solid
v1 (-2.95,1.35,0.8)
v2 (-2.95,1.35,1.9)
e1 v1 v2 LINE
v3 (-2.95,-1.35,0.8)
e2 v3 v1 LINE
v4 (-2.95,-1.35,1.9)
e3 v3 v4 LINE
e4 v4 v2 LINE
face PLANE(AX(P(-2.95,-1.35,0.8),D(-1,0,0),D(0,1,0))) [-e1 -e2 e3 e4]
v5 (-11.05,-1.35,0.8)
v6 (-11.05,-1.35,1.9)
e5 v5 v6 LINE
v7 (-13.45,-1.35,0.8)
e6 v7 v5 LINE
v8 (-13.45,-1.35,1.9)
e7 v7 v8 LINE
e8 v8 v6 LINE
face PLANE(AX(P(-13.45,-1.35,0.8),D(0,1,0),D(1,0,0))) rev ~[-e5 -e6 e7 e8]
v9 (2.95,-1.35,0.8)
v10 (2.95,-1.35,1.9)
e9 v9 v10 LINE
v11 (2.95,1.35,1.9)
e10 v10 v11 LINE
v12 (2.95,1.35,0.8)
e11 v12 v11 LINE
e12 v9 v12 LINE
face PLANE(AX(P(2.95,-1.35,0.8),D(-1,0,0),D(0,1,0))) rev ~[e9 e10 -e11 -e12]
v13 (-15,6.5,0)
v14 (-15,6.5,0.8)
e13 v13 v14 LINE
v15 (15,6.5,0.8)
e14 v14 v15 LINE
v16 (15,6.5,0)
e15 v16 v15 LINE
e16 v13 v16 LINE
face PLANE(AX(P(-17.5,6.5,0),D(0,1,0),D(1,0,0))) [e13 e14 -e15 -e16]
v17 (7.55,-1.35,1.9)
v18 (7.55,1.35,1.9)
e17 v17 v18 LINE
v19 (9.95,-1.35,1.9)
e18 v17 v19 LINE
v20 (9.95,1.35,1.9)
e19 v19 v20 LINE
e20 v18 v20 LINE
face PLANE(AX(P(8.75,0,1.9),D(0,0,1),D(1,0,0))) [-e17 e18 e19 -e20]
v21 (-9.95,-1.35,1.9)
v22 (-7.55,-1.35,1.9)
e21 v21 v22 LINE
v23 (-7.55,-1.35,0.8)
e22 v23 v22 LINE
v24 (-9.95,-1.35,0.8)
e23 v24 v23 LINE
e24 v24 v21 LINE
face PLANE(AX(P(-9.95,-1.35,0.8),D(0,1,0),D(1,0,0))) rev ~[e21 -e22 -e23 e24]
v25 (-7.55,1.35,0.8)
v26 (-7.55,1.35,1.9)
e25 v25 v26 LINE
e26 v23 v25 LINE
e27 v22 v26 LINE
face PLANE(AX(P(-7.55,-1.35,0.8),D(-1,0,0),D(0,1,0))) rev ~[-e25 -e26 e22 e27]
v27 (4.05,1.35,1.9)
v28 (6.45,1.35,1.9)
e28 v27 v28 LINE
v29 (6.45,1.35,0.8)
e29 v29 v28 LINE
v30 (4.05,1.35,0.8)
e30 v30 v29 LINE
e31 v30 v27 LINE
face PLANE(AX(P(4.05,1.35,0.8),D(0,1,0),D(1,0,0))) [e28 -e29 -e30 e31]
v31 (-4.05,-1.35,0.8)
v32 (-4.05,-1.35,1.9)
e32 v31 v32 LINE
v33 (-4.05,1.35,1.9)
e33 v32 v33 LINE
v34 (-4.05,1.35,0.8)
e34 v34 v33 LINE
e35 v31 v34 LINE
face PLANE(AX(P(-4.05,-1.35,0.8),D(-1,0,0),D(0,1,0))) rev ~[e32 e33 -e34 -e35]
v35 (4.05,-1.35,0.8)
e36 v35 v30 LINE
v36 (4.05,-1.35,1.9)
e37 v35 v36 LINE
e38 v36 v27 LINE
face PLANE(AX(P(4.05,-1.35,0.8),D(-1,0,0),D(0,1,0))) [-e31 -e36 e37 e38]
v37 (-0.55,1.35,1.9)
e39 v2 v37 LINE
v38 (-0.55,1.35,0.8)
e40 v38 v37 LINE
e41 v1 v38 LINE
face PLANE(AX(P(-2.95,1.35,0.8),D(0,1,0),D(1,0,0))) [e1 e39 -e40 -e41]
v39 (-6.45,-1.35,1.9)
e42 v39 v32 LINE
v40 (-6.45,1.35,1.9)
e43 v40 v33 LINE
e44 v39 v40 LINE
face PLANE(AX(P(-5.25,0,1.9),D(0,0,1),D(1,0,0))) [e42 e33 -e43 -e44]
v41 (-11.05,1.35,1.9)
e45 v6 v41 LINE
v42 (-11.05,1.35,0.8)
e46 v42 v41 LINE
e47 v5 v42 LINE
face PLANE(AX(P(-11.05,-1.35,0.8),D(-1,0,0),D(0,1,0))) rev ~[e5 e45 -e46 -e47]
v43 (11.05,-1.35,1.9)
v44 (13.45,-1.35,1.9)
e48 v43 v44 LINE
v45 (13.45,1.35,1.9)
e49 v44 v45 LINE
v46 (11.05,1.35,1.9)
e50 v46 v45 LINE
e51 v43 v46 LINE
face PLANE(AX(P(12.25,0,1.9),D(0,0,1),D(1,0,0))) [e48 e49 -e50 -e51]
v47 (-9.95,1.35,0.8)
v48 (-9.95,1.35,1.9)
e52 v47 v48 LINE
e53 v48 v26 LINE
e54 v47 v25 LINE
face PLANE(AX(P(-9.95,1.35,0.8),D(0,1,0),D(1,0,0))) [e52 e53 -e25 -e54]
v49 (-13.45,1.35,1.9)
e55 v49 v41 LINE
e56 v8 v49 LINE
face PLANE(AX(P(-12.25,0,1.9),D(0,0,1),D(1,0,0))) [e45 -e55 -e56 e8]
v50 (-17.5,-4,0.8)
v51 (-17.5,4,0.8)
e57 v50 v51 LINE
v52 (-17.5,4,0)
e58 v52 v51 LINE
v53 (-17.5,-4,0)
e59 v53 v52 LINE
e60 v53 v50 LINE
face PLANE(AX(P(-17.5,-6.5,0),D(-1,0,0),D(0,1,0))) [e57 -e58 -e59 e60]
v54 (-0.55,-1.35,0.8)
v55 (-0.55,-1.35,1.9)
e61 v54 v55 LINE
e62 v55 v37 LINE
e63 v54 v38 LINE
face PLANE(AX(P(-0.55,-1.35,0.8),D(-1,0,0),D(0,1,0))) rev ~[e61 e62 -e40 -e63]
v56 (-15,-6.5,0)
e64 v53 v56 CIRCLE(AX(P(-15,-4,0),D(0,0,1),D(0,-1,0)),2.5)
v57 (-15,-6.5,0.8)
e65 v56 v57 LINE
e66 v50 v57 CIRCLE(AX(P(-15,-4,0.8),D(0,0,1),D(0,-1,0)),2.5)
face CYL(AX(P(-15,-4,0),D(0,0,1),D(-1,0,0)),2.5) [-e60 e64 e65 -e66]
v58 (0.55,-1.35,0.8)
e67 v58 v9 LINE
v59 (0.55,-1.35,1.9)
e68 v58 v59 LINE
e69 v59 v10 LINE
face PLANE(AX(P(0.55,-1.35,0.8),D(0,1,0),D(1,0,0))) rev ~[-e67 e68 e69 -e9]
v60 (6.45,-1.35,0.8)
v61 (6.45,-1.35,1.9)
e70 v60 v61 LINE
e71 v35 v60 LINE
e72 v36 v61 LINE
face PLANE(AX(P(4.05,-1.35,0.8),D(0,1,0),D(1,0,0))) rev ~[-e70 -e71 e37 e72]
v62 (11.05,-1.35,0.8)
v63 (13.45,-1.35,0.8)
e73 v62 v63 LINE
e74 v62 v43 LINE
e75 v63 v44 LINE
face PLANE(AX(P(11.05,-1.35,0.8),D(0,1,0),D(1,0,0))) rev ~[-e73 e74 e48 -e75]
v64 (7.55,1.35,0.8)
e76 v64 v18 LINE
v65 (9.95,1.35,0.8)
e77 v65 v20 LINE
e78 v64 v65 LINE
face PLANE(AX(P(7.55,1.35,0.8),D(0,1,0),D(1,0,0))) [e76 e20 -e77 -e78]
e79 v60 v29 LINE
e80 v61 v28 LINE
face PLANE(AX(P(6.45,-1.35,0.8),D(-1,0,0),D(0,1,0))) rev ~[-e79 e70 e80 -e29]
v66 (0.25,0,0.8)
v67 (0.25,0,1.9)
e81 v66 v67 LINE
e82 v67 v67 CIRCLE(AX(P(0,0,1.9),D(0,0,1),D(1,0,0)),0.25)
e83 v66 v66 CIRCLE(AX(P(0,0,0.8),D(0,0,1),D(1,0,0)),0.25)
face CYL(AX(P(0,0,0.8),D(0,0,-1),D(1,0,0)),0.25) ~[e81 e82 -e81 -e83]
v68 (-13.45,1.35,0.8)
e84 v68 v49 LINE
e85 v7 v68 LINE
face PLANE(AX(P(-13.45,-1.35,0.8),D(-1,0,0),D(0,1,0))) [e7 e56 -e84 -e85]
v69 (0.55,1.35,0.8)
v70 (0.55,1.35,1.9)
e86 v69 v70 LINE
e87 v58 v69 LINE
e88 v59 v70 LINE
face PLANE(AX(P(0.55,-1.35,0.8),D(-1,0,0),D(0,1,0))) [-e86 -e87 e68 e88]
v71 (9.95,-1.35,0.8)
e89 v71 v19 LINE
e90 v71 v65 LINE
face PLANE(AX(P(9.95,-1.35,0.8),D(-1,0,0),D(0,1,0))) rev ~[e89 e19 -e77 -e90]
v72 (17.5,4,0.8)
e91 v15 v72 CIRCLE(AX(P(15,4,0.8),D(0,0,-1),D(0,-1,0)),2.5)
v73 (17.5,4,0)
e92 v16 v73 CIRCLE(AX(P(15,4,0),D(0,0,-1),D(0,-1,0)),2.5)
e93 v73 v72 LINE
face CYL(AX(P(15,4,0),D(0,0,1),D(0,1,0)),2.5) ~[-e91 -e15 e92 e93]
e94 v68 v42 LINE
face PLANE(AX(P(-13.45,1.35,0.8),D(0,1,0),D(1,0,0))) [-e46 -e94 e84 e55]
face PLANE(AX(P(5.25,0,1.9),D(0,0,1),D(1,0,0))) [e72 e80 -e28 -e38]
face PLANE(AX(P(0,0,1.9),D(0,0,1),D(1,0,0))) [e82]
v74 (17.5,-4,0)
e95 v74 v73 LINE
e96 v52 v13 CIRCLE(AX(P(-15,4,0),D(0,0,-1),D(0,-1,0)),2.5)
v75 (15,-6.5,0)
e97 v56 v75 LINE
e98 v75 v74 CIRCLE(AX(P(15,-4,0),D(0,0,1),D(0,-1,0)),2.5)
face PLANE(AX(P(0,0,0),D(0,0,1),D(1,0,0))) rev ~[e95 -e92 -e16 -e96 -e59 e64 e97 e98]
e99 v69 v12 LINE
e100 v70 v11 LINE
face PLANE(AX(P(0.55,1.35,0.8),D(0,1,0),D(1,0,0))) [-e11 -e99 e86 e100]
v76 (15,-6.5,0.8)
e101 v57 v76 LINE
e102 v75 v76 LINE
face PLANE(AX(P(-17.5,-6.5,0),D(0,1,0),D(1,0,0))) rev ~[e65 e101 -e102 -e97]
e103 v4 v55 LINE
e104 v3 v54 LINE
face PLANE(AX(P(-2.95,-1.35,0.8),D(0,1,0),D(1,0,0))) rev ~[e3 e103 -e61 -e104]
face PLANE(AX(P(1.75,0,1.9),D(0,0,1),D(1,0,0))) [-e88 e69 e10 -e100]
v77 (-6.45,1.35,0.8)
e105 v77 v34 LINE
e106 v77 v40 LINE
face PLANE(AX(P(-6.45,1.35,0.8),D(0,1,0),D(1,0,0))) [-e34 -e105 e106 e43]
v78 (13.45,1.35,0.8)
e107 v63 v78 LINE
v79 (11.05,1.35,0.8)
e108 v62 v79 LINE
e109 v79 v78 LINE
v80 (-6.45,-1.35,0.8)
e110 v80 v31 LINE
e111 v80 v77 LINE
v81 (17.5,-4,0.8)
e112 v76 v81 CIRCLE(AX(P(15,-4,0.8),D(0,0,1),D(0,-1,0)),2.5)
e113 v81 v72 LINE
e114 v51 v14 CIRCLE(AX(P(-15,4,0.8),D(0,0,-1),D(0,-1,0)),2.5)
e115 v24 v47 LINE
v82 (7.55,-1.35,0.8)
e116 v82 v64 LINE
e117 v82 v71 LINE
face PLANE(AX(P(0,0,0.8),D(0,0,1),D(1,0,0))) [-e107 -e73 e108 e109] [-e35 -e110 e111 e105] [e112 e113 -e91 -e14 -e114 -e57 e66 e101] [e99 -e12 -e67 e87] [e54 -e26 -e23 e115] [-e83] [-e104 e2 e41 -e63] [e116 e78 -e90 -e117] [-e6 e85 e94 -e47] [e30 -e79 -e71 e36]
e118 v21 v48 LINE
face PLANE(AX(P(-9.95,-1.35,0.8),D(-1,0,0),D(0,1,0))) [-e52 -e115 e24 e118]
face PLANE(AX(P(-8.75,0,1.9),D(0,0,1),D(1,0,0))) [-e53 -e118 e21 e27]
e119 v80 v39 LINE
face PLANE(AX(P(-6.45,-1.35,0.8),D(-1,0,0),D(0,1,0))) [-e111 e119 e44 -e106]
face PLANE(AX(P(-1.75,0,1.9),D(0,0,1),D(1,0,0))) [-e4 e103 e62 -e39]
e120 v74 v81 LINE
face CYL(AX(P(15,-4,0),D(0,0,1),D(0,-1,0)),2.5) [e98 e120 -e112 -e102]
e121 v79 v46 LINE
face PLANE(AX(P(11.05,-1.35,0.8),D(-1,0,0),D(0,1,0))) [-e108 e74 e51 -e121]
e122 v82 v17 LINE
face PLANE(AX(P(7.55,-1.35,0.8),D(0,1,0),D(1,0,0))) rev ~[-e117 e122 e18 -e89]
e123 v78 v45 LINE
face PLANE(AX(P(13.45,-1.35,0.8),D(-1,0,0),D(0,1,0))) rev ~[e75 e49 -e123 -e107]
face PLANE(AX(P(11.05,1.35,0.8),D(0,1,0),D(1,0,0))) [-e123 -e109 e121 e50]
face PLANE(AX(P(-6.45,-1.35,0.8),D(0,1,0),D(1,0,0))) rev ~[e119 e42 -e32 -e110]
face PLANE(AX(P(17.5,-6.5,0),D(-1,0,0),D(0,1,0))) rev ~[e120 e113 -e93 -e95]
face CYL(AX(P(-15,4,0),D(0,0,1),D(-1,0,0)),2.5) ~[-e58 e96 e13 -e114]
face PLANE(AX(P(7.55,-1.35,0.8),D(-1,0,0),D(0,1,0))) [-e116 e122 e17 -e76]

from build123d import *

# Parameters (mm, degrees)
F0_W     = 35
F0_H     = 13
F1_DEPTH = 0.8
F2_W     = 2.4
F2_H     = 2.7
F3_DEPTH = 1.1
F4_R     = 2.5
F5_R     = 0.25
F6_DEPTH = 1.1


# Not quite as in the source:
# - a feature names something its author has since deleted; it is built from what else it names


with BuildPart() as f1:
    # F0 (on Top) → F1 (new body)
    with BuildSketch(Plane.XY):
        Rectangle(F0_W, F0_H)
    extrude(amount=F1_DEPTH)

    # F2 (on face) → F3 (join)
    with BuildSketch(Plane.XY.offset(0.8)):
        with Locations((-12.25, 0)):
            Rectangle(F2_W, F2_H)
        with Locations((-8.75, 0)):
            Rectangle(F2_W, F2_H)
        with Locations((-5.25, 0)):
            Rectangle(F2_W, F2_H)
        with Locations((-1.75, 0)):
            Rectangle(F2_W, F2_H)
        with Locations((1.75, 0)):
            Rectangle(F2_W, F2_H)
        with Locations((5.25, 0)):
            Rectangle(F2_W, F2_H)
        with Locations((8.75, 0)):
            Rectangle(F2_W, F2_H)
        with Locations((12.25, 0)):
            Rectangle(F2_W, F2_H)
    extrude(amount=F3_DEPTH)

    # F4
    f4_edges = [f1.edges().sort_by_distance(p)[0] for p in [
        (-17.5, 6.5, 0.4),
        (-17.5, -6.5, 0.4),
        (17.5, -6.5, 0.4),
        (17.5, 6.5, 0.4),
    ]]
    fillet(f4_edges, radius=F4_R)

    # F5 (on face) → F6 (join)
    with BuildSketch(Plane.XY.offset(0.8)):
        Circle(F5_R)
    extrude(amount=F6_DEPTH)


solid = f1.part
